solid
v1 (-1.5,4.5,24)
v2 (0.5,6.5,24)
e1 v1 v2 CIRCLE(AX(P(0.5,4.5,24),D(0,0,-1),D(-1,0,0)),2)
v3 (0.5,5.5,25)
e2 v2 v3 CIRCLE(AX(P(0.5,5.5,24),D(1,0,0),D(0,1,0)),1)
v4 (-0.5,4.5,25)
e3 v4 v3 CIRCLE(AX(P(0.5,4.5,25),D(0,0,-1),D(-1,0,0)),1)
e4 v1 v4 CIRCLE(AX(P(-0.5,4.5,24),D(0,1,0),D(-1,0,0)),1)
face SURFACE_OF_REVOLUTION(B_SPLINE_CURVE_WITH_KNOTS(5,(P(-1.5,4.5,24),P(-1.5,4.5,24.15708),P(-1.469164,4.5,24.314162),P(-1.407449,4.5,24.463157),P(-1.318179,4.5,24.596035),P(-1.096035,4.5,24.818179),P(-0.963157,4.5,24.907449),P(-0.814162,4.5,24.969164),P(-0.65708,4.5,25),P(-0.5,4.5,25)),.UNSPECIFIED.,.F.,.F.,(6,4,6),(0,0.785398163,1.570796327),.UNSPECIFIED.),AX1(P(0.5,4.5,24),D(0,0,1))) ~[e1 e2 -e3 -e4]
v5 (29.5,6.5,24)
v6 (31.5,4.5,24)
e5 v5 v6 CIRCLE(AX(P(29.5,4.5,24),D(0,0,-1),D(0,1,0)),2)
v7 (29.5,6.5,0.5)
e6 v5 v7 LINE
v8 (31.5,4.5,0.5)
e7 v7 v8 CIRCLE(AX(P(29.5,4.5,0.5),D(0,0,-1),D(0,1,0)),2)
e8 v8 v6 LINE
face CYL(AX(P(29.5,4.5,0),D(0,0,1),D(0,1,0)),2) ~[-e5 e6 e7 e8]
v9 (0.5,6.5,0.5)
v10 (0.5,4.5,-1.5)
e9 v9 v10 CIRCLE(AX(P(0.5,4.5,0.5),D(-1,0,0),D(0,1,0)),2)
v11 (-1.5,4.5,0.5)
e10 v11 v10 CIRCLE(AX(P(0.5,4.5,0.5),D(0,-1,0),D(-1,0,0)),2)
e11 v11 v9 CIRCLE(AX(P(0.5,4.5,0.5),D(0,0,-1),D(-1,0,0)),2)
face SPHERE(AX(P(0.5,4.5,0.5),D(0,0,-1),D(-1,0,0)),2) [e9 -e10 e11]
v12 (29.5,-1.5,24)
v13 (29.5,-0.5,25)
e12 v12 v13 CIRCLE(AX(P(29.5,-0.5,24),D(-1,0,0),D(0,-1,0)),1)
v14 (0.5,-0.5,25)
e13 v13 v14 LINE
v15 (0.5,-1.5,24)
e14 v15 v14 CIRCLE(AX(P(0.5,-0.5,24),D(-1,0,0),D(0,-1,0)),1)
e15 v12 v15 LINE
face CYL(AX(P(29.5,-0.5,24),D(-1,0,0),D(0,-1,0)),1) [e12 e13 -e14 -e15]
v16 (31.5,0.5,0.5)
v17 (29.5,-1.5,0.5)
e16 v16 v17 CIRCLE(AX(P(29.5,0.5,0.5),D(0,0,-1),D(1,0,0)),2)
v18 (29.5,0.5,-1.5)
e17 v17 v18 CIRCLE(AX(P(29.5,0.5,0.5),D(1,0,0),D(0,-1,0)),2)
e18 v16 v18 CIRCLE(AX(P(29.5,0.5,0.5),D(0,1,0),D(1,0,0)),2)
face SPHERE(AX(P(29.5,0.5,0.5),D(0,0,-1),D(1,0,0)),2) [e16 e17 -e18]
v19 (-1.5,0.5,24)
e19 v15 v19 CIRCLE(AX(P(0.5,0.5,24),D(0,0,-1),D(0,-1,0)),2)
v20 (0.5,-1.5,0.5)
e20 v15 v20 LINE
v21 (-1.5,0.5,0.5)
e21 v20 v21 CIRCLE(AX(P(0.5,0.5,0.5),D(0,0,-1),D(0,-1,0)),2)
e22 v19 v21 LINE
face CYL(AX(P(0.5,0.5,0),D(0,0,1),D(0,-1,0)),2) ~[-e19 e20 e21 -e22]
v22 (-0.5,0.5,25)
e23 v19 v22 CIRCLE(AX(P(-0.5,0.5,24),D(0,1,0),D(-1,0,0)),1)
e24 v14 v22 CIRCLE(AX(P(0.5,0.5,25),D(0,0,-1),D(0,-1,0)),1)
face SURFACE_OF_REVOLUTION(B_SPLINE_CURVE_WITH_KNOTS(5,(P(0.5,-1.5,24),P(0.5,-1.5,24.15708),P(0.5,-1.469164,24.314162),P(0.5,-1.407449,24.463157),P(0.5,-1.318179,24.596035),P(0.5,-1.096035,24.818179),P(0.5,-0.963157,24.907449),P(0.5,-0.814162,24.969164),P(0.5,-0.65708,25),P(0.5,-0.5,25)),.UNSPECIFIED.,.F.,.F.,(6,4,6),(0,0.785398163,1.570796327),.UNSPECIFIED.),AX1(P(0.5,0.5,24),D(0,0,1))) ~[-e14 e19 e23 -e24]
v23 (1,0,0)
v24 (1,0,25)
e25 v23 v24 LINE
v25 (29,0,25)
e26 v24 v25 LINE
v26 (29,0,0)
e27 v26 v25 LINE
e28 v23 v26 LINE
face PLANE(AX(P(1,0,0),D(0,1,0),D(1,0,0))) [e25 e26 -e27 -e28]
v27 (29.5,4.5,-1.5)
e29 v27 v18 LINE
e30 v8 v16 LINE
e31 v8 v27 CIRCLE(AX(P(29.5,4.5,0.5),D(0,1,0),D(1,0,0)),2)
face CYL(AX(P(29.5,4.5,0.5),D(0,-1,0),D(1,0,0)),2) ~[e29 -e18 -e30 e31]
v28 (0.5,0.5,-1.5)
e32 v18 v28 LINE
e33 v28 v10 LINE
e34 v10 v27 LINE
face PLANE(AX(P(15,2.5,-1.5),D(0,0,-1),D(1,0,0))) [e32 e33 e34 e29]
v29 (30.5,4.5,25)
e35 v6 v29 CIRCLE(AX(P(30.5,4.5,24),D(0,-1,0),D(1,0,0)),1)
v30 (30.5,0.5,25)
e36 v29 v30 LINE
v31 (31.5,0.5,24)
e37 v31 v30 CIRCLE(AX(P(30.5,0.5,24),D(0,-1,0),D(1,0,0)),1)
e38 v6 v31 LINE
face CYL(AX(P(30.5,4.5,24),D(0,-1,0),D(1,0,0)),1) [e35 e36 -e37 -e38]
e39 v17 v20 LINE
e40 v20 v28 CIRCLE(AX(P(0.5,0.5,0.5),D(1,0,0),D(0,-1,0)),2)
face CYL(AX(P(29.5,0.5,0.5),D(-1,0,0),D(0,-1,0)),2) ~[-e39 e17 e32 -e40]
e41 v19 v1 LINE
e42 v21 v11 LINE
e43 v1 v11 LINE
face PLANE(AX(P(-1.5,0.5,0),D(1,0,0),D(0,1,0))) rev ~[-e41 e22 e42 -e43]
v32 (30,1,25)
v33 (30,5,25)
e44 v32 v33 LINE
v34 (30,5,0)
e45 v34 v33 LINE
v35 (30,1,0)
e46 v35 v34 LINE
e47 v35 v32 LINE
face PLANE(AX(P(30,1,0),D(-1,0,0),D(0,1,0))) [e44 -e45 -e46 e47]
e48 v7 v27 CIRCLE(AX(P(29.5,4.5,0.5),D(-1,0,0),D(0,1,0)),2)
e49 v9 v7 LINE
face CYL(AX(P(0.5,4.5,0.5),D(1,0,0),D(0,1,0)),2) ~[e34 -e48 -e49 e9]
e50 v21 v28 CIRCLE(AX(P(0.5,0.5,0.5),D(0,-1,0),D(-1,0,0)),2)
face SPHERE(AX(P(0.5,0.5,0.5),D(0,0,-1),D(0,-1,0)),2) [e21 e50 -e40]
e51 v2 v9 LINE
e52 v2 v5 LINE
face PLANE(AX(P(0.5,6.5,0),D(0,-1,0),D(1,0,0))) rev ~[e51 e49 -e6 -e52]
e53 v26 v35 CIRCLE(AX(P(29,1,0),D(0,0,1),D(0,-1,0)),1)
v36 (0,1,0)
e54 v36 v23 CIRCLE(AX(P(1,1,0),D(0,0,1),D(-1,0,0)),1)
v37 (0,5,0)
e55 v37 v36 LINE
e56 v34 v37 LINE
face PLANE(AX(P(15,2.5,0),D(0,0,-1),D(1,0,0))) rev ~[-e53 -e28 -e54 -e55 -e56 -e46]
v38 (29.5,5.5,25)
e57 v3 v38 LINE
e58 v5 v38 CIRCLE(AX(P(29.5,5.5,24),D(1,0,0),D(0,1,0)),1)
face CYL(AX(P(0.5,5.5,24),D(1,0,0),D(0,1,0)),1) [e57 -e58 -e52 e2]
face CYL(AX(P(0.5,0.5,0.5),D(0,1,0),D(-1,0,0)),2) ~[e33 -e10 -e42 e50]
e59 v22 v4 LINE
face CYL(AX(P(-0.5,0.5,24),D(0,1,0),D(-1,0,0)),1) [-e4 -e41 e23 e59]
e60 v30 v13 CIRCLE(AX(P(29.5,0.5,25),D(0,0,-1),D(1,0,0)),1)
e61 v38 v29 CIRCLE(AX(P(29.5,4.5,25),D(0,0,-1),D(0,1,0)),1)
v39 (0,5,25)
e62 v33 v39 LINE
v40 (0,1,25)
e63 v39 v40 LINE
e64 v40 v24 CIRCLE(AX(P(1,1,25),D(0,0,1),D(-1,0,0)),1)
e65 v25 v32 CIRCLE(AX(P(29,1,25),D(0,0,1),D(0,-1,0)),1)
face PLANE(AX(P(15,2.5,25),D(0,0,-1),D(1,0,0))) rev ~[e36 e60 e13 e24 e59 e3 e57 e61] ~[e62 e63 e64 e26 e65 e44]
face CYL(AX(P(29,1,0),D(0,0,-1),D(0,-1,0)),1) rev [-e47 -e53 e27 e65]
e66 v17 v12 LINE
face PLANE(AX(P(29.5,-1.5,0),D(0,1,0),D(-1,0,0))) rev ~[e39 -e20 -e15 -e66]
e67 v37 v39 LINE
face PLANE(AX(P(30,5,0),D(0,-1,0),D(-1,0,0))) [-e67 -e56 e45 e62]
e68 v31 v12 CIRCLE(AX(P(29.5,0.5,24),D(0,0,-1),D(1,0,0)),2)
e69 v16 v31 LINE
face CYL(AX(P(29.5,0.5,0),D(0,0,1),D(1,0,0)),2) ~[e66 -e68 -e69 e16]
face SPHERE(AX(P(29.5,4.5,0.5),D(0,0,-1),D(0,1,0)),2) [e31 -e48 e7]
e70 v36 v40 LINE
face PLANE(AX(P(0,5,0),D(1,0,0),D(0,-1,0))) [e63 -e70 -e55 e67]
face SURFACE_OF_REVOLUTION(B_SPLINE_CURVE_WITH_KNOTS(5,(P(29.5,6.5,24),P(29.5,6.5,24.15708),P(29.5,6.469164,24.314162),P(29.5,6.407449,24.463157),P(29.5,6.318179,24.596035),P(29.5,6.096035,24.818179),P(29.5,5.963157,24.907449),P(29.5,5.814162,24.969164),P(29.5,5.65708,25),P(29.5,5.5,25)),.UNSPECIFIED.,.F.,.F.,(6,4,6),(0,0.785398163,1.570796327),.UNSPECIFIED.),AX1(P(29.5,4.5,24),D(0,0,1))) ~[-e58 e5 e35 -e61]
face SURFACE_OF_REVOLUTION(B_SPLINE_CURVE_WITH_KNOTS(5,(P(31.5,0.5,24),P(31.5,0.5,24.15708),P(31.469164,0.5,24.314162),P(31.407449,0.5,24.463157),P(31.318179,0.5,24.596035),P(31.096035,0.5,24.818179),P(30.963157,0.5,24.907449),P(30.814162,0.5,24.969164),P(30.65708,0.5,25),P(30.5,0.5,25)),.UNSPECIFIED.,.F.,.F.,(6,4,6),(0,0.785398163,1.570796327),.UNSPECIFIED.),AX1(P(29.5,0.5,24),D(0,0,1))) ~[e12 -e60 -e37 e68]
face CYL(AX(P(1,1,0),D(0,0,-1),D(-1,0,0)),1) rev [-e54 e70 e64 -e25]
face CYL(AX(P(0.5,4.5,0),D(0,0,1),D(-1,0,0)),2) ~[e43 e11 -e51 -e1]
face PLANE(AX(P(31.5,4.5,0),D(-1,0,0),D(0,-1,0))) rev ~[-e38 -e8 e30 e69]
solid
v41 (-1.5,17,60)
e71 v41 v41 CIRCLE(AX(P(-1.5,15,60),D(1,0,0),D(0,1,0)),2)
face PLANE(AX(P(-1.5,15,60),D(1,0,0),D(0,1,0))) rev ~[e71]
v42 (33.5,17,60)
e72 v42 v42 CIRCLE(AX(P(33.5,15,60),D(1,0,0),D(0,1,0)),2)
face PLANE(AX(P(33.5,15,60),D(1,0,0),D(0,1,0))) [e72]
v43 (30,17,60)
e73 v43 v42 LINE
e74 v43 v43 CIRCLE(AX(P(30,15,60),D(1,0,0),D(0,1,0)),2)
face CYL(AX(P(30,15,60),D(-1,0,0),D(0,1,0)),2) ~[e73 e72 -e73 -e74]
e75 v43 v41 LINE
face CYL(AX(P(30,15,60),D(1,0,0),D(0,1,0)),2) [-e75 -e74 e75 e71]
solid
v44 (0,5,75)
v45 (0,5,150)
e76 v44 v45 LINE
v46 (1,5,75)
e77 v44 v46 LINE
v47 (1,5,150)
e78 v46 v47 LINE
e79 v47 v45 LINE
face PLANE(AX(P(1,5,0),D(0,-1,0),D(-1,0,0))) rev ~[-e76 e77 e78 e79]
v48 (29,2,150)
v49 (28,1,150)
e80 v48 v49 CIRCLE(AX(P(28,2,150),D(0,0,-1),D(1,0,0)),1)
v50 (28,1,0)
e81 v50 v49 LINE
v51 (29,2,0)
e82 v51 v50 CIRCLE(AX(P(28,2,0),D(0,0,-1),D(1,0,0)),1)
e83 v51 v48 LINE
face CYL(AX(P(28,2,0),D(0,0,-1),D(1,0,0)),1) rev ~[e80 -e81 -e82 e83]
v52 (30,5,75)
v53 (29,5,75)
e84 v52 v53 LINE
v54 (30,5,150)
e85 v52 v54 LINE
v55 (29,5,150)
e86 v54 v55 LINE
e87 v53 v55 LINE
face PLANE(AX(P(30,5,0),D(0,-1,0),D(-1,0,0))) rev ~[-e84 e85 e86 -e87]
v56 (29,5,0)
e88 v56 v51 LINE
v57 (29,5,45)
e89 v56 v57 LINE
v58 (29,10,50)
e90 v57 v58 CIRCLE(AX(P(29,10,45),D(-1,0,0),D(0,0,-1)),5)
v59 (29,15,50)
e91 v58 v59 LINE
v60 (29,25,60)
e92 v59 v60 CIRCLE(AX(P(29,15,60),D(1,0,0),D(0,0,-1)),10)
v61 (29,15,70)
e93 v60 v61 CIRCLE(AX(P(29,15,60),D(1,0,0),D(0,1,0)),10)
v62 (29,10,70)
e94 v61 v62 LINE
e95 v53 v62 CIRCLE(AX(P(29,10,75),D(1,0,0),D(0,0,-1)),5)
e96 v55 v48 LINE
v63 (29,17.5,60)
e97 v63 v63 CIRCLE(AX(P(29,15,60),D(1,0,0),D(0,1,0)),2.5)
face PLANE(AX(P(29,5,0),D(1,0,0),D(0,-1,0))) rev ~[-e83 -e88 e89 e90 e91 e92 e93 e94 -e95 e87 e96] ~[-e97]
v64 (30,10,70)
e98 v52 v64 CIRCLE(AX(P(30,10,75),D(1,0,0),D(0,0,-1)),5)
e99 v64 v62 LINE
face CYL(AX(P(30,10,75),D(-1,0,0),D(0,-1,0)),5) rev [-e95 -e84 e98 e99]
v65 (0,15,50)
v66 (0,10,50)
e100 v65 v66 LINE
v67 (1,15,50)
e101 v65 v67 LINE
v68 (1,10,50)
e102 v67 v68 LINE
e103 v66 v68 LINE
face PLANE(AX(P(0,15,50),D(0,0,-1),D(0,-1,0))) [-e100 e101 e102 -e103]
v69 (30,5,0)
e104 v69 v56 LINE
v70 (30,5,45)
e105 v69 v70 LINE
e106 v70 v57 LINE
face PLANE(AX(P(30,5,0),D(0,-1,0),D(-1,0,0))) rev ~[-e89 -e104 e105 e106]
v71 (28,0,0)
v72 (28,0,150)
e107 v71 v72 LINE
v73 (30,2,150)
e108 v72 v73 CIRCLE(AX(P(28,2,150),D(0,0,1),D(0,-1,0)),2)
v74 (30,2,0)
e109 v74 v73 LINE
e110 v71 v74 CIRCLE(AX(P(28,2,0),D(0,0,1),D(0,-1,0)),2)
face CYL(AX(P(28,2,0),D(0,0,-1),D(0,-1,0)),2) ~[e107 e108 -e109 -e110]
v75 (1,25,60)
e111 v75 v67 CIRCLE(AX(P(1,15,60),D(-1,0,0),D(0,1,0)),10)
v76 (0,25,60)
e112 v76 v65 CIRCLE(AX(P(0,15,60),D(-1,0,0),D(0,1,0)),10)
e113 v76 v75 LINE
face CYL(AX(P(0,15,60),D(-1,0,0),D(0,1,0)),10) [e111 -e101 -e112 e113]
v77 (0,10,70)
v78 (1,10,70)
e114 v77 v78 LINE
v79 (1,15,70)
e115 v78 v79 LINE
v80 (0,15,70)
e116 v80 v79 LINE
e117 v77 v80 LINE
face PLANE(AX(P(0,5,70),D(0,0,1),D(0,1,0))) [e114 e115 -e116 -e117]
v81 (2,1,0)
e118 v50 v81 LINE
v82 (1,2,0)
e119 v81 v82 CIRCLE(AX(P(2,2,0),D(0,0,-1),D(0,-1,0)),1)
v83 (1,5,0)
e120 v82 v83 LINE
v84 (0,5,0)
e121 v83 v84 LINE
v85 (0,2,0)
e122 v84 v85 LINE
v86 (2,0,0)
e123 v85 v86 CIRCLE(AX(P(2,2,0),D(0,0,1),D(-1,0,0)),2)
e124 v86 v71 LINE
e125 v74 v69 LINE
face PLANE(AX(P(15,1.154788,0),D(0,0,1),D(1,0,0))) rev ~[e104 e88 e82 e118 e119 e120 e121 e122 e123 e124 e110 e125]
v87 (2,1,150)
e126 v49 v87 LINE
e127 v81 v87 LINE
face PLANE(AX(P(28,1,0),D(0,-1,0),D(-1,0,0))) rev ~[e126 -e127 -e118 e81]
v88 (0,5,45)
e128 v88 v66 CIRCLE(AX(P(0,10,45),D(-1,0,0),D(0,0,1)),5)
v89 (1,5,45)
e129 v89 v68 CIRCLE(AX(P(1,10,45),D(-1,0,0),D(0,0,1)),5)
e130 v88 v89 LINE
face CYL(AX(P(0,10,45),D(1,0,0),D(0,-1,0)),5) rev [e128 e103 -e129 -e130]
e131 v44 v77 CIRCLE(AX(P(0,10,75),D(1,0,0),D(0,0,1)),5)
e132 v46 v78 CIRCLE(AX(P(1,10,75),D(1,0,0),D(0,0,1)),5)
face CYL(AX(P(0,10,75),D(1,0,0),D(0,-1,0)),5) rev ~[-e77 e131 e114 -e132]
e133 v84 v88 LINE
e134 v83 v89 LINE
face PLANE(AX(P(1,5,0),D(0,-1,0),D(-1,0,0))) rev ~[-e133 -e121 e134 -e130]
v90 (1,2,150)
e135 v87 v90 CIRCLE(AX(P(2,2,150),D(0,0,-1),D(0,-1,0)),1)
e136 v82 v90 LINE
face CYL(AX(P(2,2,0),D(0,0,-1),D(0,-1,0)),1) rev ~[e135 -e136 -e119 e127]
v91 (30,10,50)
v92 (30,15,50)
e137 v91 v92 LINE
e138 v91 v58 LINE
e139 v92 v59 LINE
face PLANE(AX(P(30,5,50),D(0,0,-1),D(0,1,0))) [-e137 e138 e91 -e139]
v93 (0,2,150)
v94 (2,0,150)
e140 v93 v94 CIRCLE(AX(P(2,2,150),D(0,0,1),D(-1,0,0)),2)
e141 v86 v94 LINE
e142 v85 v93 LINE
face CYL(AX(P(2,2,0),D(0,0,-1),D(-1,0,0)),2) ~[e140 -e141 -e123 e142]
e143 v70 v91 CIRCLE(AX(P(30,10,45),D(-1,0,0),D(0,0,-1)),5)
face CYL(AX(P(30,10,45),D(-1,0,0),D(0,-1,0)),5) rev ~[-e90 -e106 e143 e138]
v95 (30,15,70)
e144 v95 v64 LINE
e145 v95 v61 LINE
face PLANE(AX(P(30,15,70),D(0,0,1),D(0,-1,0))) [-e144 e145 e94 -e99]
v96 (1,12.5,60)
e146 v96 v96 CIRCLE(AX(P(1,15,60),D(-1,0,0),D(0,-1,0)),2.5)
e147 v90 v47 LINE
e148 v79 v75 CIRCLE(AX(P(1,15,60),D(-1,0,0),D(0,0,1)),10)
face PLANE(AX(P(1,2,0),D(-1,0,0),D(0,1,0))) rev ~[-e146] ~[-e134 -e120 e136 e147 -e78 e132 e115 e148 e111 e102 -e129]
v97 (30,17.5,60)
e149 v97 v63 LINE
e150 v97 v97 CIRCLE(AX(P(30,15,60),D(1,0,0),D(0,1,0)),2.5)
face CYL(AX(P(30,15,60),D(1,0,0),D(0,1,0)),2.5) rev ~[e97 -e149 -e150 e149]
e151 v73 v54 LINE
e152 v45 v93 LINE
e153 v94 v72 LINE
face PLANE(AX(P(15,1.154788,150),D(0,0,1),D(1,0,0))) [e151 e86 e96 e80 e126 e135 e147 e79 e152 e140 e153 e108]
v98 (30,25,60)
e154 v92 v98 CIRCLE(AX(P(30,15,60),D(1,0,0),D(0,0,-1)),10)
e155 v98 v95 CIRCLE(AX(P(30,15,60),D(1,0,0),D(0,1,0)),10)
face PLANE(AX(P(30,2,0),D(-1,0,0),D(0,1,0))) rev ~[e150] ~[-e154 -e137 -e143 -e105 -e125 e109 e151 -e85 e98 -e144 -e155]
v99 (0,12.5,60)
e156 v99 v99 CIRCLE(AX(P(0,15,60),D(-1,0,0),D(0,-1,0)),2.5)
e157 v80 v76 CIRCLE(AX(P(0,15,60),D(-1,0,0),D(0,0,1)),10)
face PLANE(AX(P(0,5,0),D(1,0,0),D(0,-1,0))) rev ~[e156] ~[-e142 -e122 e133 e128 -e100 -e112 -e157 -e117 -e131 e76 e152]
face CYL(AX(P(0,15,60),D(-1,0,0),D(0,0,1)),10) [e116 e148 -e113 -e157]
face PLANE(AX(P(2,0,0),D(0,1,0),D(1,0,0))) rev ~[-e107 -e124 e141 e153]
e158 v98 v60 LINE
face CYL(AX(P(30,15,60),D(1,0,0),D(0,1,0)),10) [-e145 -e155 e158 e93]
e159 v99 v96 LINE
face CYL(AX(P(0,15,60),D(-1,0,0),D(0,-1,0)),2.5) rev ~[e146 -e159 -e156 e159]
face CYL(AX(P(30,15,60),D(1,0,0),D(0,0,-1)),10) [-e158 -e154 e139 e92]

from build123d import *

# Parameters (mm, degrees)
F1_DEPTH       = 150
F2_R           = 2.5
F3_DEPTH       = 1
F4_R           = 5
F5_R           = 2.5
F6_DEPTH       = 1
F7_R           = 5
F10_R          = 2
F11_DEPTH      = 31.5
F11_DEPTH_BACK = 3.5
F13_DEPTH      = 25
F15_DEPTH      = 1.5
F16_R          = 2
F17_R          = 1


with BuildPart() as f1:
    # F0 (on Top) → F1 (new body)
    with BuildSketch(Plane.XY):
        with BuildLine():
            ThreePointArc((0, 2), (0.5857864376, 0.5857864376), (2, 0))
            Line((2, 0), (28, 0))
            ThreePointArc((28, 0), (29.4142135624, 0.5857864376), (30, 2))
            Line((30, 2), (30, 5))
            Line((30, 5), (29, 5))
            Line((29, 5), (29, 2))
            ThreePointArc((29, 2), (28.7071067812, 1.2928932188), (28, 1))
            Line((28, 1), (2, 1))
            ThreePointArc((2, 1), (1.2928932188, 1.2928932188), (1, 2))
            Line((1, 2), (1, 5))
            Line((1, 5), (0, 5))
            Line((0, 5), (0, 2))
        make_face()
    extrude(amount=F1_DEPTH)

    # F2 (on face) → F3 (join)
    with BuildSketch(Plane(origin=(0, 0, 0), x_dir=(0, -1, 0), z_dir=(-1, 0, 0))):
        with BuildLine():
            Line((-15, 50), (-5, 50))
            Line((-5, 50), (-5, 70))
            Line((-5, 70), (-15, 70))
            ThreePointArc((-15, 70), (-22.0710678119, 67.0710678119), (-25, 60))
            ThreePointArc((-25, 60), (-22.0710678119, 52.9289321881), (-15, 50))
        make_face()
        with Locations((-15, 60)):
            Circle(F2_R, mode=Mode.SUBTRACT)
    extrude(amount=-F3_DEPTH)

    # F4
    f4_edges = [f1.edges().sort_by_distance(p)[0] for p in [
        (0.5, 5, 50),
        (0.5, 5, 70),
    ]]
    fillet(f4_edges, radius=F4_R)

    # F5 (on face) → F6 (join)
    with BuildSketch(Plane.YZ.offset(30)):
        with BuildLine():
            Line((15, 70), (5, 70))
            Line((5, 70), (5, 50))
            Line((5, 50), (15, 50))
            ThreePointArc((15, 50), (22.0710678119, 52.9289321881), (25, 60))
            ThreePointArc((25, 60), (22.0710678119, 67.0710678119), (15, 70))
        make_face()
        with Locations((15, 60)):
            Circle(F5_R, mode=Mode.SUBTRACT)
    extrude(amount=-F6_DEPTH)

    # F7
    f7_edges = [f1.edges().sort_by_distance(p)[0] for p in [
        (29.5, 5, 70),
        (29.5, 5, 50),
    ]]
    fillet(f7_edges, radius=F7_R)


with BuildPart() as f8_1:
    # F8: copy of F1
    add(f1.part.moved(Location((0, 75, 0))))


with BuildPart() as f11:
    # F10 (on face) → F11 (new body, two sides)
    with BuildSketch(Plane.YZ.offset(30)) as f11_sk:
        with Locations((15, 60)):
            Circle(F10_R)
    extrude(amount=-F11_DEPTH)
    extrude(f11_sk.sketch, amount=F11_DEPTH_BACK)


with BuildPart() as f13:
    # F12 (on face) → F13 (new body)
    with BuildSketch(Plane(origin=(0, 0, 0), x_dir=(1, 0, 0), z_dir=(0, 0, -1))):
        with BuildLine():
            Line((31.5, -4.5), (31.5, -0.5))
            ThreePointArc((31.5, -0.5), (30.9142135624, 0.9142135624), (29.5, 1.5))
            Line((29.5, 1.5), (0.5, 1.5))
            ThreePointArc((0.5, 1.5), (-0.9142135624, 0.9142135624), (-1.5, -0.5))
            Line((-1.5, -0.5), (-1.5, -4.5))
            ThreePointArc((-1.5, -4.5), (-0.9142135624, -5.9142135624), (0.5, -6.5))
            Line((0.5, -6.5), (29.5, -6.5))
            ThreePointArc((29.5, -6.5), (30.9142135624, -5.9142135624), (31.5, -4.5))
        make_face()
        with BuildLine():
            ThreePointArc((0, -1), (0.2928932188, -0.2928932188), (1, 0))
            Line((1, 0), (2, 0))
            Line((2, 0), (28, 0))
            Line((28, 0), (29, 0))
            ThreePointArc((29, 0), (29.7071067812, -0.2928932188), (30, -1))
            Line((30, -1), (30, -2))
            Line((30, -2), (30, -5))
            Line((30, -5), (29, -5))
            Line((29, -5), (1, -5))
            Line((1, -5), (0, -5))
            Line((0, -5), (0, -2))
            Line((0, -2), (0, -1))
        make_face(mode=Mode.SUBTRACT)
    extrude(amount=-F13_DEPTH)

    # F14 (on face) → F15 (join)
    with BuildSketch(Plane(origin=(0, 0, 0), x_dir=(1, 0, 0), z_dir=(0, 0, -1))):
        with BuildLine():
            Line((29.5, 1.5), (0.5, 1.5))
            ThreePointArc((0.5, 1.5), (-0.9142135624, 0.9142135624), (-1.5, -0.5))
            Line((-1.5, -0.5), (-1.5, -4.5))
            ThreePointArc((-1.5, -4.5), (-0.9142135624, -5.9142135624), (0.5, -6.5))
            Line((0.5, -6.5), (29.5, -6.5))
            ThreePointArc((29.5, -6.5), (30.9142135624, -5.9142135624), (31.5, -4.5))
            Line((31.5, -4.5), (31.5, -0.5))
            ThreePointArc((31.5, -0.5), (30.9142135624, 0.9142135624), (29.5, 1.5))
        make_face()
    extrude(amount=F15_DEPTH)

    # F16
    f16_edges = [f13.edges().sort_by_distance(p)[0] for p in [
        (15, -1.5, -1.5),
        (-0.914214, 5.914214, -1.5),
        (-1.5, 2.5, -1.5),
        (-0.914214, -0.914214, -1.5),
        (30.914214, -0.914214, -1.5),
        (31.5, 2.5, -1.5),
        (30.914214, 5.914214, -1.5),
        (15, 6.5, -1.5),
    ]]
    fillet(f16_edges, radius=F16_R)

    # F17
    f17_edges = [f13.edges().sort_by_distance(p)[0] for p in [
        (15, -1.5, 25),
        (-0.914214, 5.914214, 25),
        (15, 6.5, 25),
        (30.914214, 5.914214, 25),
        (31.5, 2.5, 25),
        (30.914214, -0.914214, 25),
        (-0.914214, -0.914214, 25),
        (-1.5, 2.5, 25),
    ]]
    fillet(f17_edges, radius=F17_R)


solid = Compound([f1.part, f11.part, f13.part])
